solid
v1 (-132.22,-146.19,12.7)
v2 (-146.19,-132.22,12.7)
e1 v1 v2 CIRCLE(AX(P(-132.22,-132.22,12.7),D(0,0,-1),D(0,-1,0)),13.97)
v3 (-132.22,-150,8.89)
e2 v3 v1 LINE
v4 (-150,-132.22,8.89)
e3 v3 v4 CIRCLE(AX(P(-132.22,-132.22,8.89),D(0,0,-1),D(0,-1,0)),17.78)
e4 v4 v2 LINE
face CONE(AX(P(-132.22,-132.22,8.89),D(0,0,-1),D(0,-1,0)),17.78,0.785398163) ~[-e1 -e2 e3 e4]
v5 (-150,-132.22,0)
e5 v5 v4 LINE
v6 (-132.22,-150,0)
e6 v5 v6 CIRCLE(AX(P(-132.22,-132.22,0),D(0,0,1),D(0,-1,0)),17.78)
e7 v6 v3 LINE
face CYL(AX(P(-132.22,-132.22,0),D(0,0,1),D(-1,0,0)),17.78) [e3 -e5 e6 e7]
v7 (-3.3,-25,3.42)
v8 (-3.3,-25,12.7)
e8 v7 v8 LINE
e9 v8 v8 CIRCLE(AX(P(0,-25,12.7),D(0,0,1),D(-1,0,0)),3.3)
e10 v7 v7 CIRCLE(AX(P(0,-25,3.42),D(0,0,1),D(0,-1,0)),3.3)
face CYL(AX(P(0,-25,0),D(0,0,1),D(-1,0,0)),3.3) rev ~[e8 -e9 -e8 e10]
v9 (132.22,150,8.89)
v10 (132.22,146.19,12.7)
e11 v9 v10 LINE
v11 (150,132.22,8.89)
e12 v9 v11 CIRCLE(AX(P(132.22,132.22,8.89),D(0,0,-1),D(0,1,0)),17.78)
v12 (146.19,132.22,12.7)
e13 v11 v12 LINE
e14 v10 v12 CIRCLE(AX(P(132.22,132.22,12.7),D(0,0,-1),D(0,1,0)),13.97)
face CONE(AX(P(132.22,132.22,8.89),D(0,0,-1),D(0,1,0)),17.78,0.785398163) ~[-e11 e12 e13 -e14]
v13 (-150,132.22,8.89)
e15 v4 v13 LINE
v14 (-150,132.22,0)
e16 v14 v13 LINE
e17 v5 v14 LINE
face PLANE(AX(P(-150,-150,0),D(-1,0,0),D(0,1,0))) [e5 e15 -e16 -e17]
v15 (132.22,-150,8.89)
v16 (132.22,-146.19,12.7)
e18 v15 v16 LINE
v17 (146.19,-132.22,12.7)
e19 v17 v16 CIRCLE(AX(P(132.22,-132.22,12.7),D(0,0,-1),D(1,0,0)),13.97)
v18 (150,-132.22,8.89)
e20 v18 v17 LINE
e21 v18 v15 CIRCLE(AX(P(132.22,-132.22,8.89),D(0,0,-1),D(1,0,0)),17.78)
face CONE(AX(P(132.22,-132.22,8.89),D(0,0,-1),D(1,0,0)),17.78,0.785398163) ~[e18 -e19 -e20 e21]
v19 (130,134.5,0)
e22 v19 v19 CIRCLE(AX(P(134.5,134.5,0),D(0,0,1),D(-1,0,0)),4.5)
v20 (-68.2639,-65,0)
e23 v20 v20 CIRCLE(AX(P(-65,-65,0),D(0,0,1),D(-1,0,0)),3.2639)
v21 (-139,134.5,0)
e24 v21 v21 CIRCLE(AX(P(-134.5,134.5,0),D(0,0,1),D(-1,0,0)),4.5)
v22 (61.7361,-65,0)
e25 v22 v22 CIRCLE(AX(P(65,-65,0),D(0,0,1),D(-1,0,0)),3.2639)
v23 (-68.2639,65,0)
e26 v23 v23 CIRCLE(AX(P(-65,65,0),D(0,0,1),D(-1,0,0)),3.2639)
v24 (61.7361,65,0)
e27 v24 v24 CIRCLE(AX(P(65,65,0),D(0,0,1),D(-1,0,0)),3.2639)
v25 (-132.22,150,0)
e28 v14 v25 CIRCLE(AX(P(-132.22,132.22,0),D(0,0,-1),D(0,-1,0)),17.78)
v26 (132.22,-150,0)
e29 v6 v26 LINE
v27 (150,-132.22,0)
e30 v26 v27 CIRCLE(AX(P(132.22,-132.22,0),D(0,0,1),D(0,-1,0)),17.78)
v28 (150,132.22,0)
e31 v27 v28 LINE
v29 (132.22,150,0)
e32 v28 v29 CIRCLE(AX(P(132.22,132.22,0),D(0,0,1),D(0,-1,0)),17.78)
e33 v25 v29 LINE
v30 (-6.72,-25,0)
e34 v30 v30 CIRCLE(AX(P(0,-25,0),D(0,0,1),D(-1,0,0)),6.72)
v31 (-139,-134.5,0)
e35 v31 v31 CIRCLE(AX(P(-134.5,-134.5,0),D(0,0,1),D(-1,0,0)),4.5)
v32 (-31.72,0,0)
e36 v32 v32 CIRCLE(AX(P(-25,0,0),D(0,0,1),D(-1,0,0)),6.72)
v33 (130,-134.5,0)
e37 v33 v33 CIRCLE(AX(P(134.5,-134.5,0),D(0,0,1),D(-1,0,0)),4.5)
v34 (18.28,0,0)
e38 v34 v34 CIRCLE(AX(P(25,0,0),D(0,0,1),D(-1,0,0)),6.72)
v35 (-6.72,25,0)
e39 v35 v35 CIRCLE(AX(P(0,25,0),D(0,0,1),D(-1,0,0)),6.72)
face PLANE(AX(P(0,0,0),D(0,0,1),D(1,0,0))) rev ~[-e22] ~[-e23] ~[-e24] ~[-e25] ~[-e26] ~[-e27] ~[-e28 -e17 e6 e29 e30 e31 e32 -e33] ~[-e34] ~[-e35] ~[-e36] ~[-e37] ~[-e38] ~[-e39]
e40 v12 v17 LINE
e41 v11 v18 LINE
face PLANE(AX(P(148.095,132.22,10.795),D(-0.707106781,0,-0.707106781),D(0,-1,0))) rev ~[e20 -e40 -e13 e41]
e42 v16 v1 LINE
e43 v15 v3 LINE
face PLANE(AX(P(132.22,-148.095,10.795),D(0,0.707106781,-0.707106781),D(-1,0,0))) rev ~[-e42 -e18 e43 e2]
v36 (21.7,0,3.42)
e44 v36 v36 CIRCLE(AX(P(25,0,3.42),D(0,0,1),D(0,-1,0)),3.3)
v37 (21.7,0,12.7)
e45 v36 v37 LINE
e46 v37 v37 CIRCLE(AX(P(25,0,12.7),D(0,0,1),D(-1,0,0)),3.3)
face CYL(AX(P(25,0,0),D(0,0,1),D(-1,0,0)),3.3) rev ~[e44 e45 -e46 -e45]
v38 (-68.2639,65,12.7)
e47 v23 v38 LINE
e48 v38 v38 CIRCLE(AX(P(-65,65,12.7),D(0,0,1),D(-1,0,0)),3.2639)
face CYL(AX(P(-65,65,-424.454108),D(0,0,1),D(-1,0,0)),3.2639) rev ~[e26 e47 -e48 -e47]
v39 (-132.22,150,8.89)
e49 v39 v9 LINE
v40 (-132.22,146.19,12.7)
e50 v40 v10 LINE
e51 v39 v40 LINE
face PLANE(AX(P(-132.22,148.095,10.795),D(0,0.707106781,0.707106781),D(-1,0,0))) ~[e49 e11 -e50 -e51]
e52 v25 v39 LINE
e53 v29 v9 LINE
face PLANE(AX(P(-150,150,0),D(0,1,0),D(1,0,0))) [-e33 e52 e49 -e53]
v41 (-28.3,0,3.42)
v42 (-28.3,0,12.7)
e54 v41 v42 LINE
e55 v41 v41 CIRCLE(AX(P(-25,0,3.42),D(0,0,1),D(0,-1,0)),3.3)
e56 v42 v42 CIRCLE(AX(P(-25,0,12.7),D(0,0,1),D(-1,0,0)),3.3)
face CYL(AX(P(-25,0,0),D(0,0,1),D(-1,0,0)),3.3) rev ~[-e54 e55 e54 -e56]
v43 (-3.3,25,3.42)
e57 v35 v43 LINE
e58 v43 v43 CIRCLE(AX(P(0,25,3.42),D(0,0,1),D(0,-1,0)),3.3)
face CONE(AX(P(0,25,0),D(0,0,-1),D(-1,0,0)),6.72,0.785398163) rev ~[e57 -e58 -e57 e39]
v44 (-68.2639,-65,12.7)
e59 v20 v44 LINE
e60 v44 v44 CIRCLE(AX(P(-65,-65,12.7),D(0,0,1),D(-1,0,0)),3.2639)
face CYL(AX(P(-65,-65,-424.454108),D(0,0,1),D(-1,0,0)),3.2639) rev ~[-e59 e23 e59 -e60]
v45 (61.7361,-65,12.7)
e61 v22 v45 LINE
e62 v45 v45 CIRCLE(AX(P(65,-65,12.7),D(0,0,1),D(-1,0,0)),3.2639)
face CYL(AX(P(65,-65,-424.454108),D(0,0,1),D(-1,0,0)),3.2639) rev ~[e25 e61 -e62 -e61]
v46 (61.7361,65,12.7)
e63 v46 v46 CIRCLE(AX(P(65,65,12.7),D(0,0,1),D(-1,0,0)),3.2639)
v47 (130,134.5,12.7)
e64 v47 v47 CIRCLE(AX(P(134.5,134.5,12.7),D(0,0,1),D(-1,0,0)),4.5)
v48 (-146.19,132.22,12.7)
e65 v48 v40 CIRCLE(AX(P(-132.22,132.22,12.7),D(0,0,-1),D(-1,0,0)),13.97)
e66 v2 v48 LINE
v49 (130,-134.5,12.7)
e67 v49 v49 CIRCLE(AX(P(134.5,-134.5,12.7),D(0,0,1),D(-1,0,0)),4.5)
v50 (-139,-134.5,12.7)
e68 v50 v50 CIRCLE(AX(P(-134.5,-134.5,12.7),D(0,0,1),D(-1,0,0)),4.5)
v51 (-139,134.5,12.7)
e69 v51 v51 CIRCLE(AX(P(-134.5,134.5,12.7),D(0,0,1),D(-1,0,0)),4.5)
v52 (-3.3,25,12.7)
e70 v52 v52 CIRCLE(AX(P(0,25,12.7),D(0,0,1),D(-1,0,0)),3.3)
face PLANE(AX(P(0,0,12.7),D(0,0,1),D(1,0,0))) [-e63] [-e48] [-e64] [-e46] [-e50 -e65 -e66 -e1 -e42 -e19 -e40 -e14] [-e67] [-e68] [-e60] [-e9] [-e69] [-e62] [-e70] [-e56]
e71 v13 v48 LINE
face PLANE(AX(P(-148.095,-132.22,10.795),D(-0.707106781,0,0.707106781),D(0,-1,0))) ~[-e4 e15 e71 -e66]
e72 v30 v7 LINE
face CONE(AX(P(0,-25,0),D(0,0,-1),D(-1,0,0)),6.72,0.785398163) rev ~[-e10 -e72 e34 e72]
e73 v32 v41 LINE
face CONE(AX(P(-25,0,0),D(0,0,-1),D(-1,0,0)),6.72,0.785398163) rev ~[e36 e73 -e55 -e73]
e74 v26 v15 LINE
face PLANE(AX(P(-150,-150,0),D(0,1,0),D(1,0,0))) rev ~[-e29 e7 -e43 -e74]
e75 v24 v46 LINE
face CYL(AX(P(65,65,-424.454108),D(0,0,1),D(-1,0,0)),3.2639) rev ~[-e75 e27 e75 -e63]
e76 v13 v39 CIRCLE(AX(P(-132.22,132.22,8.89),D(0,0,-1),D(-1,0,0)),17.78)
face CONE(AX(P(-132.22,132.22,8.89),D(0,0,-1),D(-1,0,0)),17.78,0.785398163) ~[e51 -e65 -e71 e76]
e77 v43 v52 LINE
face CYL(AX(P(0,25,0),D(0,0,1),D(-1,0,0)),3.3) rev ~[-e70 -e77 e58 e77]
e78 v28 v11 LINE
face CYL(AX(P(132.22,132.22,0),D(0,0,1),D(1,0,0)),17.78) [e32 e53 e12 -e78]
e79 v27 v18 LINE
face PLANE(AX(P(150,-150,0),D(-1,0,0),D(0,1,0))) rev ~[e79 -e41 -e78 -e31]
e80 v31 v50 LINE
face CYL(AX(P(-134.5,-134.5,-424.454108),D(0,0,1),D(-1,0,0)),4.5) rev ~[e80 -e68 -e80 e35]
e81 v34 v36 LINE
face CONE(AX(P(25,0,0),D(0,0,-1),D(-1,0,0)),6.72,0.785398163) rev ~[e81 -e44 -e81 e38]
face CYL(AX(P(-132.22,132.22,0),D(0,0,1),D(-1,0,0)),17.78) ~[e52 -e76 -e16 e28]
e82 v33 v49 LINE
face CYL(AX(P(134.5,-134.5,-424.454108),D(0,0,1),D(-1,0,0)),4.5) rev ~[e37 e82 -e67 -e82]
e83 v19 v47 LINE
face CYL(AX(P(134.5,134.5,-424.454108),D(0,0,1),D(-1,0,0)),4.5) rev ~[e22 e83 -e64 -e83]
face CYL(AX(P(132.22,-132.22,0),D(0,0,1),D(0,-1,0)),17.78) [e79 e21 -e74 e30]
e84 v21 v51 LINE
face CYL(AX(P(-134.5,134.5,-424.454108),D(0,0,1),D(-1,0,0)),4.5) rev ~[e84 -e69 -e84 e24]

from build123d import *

# Parameters (mm, degrees)
F0_W           = 300
F0_H           = 300
F1_DEPTH       = 12.7
F2_R           = 17.78
F3_SIZE        = 3.81
F5_D           = 9
F7_D           = 6.5278
F9_D           = 6.6
F9_CSINK_D     = 13.44
F9_CSINK_ANGLE = 90


with BuildPart() as f1:
    # F0 (on Top) → F1 (new body)
    with BuildSketch(Plane.XY):
        Rectangle(F0_W, F0_H)
    extrude(amount=F1_DEPTH)

    # F2
    f2_edges = [f1.edges().sort_by_distance(p)[0] for p in [
        (-150, -150, 6.35),
        (150, -150, 6.35),
        (150, 150, 6.35),
        (-150, 150, 6.35),
    ]]
    fillet(f2_edges, radius=F2_R)

    # F3
    f3_edges = [f1.edges().sort_by_distance(p)[0] for p in [
        (-150, 0, 12.7),
        (0, 150, 12.7),
        (150, 0, 12.7),
        (0, -150, 12.7),
        (144.792359, -144.792359, 12.7),
        (144.792359, 144.792359, 12.7),
        (-144.792359, -144.792359, 12.7),
        (-144.792359, 144.792359, 12.7),
    ]]
    chamfer(f3_edges, length=F3_SIZE)

    # F5 (through all)
    with Locations(Plane(origin=(0, 0, 0), x_dir=(1, 0, 0), z_dir=(0, 0, -1))):
        with Locations((-134.5, 134.5), (134.5, 134.5), (-134.5, -134.5), (134.5, -134.5)):
            Hole(F5_D / 2)

    # F7 (through all)
    with Locations(Plane(origin=(0, 0, 0), x_dir=(1, 0, 0), z_dir=(0, 0, -1))):
        with Locations((-65, 65), (65, 65), (65, -65), (-65, -65)):
            Hole(F7_D / 2)

    # F9 (through all)
    with Locations(Plane(origin=(0, 0, 0), x_dir=(1, 0, 0), z_dir=(0, 0, -1))):
        with Locations((0, 25), (25, 0), (0, -25), (-25, 0)):
            CounterSinkHole(F9_D / 2, F9_CSINK_D / 2, counter_sink_angle=F9_CSINK_ANGLE)


solid = f1.part
